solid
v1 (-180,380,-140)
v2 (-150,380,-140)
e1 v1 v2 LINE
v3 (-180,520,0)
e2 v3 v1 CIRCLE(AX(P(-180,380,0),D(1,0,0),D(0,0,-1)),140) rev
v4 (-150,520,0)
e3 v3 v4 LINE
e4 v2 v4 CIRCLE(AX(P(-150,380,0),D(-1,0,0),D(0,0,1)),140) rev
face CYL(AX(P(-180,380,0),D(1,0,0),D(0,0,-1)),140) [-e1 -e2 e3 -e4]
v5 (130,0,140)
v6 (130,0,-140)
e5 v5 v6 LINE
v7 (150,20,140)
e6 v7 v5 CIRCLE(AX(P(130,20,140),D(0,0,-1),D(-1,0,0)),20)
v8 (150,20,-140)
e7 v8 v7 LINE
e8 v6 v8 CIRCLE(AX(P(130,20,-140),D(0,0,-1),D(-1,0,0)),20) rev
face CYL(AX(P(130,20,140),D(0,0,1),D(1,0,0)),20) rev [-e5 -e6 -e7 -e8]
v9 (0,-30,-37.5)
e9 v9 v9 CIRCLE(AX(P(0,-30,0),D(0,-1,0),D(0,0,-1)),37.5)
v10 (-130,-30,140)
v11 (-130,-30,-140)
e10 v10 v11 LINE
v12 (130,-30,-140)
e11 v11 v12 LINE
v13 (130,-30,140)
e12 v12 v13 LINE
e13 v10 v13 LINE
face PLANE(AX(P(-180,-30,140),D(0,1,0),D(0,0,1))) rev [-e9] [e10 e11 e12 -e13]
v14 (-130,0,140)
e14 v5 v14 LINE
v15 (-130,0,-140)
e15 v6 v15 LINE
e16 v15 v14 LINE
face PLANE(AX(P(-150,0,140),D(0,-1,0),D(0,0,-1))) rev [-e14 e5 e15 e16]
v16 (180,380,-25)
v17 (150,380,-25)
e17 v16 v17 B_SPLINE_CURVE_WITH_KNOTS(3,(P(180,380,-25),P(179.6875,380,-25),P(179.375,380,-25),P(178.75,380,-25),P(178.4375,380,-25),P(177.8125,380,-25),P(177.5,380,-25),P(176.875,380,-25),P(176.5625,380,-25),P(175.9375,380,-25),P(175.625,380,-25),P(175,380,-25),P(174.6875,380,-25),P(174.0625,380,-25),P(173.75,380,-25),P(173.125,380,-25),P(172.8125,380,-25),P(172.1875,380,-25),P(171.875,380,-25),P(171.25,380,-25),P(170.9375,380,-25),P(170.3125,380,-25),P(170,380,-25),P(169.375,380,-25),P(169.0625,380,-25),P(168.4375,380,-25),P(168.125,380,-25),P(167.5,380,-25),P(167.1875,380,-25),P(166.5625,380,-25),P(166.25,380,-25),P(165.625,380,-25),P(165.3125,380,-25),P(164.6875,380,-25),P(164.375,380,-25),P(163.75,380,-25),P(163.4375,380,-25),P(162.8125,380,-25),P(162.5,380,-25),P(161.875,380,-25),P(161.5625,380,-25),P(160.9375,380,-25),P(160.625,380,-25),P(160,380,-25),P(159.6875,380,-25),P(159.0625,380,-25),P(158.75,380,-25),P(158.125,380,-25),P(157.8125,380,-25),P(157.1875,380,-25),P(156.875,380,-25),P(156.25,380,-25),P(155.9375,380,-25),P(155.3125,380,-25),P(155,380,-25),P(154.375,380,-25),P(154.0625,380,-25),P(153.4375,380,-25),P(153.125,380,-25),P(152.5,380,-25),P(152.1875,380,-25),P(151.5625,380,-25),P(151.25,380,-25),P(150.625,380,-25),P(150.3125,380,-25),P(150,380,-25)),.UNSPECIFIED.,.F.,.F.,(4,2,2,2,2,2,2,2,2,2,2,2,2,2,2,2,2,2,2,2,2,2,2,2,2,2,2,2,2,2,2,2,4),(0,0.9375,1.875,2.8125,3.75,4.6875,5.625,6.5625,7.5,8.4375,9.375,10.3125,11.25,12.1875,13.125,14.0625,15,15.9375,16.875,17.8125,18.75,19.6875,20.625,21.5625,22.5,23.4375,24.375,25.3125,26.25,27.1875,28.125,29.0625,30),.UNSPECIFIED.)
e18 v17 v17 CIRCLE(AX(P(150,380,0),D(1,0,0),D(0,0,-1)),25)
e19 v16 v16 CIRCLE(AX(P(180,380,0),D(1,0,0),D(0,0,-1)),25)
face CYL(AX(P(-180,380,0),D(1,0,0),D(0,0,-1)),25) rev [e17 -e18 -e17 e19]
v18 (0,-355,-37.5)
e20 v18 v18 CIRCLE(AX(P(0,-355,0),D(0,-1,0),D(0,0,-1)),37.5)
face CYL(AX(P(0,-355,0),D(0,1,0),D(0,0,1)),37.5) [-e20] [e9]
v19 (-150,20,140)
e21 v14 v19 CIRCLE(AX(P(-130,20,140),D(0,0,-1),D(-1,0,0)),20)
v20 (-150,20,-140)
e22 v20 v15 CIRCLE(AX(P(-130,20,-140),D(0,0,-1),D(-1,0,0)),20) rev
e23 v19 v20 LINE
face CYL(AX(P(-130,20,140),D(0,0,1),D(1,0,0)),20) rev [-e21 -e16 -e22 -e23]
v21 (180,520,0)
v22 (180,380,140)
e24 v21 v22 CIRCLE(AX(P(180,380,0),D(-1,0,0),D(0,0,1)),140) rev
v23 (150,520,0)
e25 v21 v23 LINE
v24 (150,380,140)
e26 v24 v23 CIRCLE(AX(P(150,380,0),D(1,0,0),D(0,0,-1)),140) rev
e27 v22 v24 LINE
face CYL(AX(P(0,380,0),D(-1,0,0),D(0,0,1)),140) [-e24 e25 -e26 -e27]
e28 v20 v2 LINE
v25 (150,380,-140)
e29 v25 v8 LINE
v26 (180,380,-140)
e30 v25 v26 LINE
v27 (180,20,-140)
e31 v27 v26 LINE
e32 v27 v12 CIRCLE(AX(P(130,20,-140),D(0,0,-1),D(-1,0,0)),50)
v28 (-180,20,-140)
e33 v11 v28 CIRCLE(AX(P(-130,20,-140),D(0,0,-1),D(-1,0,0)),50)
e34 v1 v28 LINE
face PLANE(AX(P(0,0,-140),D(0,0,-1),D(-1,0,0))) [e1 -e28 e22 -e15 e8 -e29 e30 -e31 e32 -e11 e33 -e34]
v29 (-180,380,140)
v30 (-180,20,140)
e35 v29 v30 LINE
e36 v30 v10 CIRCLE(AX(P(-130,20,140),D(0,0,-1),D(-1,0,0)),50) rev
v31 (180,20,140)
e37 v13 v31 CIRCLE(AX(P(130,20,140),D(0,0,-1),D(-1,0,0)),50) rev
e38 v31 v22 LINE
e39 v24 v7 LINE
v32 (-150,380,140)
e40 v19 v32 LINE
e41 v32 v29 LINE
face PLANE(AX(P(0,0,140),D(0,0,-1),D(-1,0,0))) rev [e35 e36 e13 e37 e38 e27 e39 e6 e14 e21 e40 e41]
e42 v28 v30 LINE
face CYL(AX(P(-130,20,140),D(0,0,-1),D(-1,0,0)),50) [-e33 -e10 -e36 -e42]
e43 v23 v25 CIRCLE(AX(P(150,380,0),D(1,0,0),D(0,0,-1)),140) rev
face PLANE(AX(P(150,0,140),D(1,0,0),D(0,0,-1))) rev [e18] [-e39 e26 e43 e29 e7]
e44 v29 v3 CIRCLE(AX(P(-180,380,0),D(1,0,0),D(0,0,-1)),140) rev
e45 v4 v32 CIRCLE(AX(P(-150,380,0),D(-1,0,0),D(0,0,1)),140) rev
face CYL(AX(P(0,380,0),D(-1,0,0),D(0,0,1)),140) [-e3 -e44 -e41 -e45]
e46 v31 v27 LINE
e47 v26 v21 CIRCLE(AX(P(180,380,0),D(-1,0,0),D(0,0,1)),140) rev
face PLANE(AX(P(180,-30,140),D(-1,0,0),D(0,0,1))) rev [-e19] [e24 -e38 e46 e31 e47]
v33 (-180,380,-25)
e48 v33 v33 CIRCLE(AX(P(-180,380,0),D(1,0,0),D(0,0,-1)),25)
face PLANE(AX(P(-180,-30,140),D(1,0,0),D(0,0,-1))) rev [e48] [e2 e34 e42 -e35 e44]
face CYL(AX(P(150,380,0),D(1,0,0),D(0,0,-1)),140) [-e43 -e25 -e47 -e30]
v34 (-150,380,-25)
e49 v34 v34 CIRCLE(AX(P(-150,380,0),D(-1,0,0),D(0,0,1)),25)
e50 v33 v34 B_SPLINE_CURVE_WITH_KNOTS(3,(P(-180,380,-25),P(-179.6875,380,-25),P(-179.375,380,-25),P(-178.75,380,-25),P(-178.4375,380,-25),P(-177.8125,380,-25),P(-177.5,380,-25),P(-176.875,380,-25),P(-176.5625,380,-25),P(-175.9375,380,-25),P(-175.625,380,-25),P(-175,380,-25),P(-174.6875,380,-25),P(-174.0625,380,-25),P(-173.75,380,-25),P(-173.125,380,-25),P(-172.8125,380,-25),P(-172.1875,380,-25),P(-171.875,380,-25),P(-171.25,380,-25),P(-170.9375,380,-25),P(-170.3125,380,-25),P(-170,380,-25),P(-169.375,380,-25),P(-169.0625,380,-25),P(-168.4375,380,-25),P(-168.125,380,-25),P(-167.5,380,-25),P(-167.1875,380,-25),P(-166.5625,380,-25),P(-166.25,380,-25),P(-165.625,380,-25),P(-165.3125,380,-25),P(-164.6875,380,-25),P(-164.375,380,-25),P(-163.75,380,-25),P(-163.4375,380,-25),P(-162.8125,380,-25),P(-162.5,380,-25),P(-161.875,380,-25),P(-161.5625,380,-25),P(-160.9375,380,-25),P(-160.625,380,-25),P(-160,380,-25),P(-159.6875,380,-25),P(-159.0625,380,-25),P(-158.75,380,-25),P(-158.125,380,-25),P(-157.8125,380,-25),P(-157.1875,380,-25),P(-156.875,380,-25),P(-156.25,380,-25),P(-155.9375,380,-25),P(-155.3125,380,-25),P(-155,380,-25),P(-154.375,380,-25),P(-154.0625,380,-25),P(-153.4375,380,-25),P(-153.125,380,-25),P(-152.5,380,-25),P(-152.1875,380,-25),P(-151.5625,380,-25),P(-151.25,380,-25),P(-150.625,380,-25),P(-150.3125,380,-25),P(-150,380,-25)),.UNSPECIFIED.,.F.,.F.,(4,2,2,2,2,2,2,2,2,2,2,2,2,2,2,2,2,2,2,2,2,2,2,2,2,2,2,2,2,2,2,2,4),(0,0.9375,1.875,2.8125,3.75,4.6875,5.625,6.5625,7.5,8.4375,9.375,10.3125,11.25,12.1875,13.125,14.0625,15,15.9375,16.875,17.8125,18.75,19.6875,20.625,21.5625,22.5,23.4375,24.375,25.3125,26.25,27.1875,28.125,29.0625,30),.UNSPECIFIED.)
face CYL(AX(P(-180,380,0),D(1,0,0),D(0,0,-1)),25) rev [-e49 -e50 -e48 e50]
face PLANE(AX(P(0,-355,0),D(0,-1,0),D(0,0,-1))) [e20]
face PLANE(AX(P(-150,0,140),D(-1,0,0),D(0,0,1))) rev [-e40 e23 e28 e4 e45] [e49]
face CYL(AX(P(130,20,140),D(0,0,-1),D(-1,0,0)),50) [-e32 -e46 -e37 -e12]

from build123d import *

# Parameters (mm, degrees)
BOSS_EXTRUDE1_DEPTH = 140
FILLET1_R           = 140
SKETCH2_R           = 25
CUT_EXTRUDE1_DEPTH  = 648.765389628
SKETCH3_R           = 37.5
BOSS_EXTRUDE2_DEPTH = 325
FILLET2_R           = 20
FILLET3_R           = 50


with BuildPart() as part:
    # Sketch1 → Boss-Extrude1 (new, symmetric)
    with BuildSketch(Plane.XY):
        Polygon((-150, 0), (150, 0), (150, 520), (180, 520), (180, -30), (-180, -30), (-180, 520), (-150, 520), align=None)
    extrude(amount=BOSS_EXTRUDE1_DEPTH, both=True)

    # Fillet1
    fillet1_edges = [part.edges().sort_by_distance(p)[0] for p in [
        (165, 520, 140),
        (165, 520, -140),
        (-165, 520, -140),
        (-165, 520, 140),
    ]]
    fillet(fillet1_edges, radius=FILLET1_R - 0.0001)  # a hair under: the kernel refuses the full size

    # Sketch2 → Cut-Extrude1 (cut, through all)
    with BuildSketch(Plane(origin=(180, 0, 0), x_dir=(0, 0, -1), z_dir=(1, 0, 0))):
        with Locations((0, 380)):
            Circle(SKETCH2_R)
    extrude(amount=-CUT_EXTRUDE1_DEPTH, mode=Mode.SUBTRACT)

    # Sketch3 → Boss-Extrude2 (add)
    with BuildSketch(Plane.XZ.offset(30)):
        with Locations(Location((0, 0, 0), (0, 0, 270))):
            Circle(SKETCH3_R)
    extrude(amount=BOSS_EXTRUDE2_DEPTH)

    # Fillet2
    fillet2_edges = [part.edges().sort_by_distance(p)[0] for p in [
        (-150, 0, 0),
        (150, 0, 0),
    ]]
    fillet(fillet2_edges, radius=FILLET2_R)

    # Fillet3
    fillet3_edges = [part.edges().sort_by_distance(p)[0] for p in [
        (180, -30, 0),
        (-180, -30, 0),
    ]]
    fillet(fillet3_edges, radius=FILLET3_R)


solid = part.part
